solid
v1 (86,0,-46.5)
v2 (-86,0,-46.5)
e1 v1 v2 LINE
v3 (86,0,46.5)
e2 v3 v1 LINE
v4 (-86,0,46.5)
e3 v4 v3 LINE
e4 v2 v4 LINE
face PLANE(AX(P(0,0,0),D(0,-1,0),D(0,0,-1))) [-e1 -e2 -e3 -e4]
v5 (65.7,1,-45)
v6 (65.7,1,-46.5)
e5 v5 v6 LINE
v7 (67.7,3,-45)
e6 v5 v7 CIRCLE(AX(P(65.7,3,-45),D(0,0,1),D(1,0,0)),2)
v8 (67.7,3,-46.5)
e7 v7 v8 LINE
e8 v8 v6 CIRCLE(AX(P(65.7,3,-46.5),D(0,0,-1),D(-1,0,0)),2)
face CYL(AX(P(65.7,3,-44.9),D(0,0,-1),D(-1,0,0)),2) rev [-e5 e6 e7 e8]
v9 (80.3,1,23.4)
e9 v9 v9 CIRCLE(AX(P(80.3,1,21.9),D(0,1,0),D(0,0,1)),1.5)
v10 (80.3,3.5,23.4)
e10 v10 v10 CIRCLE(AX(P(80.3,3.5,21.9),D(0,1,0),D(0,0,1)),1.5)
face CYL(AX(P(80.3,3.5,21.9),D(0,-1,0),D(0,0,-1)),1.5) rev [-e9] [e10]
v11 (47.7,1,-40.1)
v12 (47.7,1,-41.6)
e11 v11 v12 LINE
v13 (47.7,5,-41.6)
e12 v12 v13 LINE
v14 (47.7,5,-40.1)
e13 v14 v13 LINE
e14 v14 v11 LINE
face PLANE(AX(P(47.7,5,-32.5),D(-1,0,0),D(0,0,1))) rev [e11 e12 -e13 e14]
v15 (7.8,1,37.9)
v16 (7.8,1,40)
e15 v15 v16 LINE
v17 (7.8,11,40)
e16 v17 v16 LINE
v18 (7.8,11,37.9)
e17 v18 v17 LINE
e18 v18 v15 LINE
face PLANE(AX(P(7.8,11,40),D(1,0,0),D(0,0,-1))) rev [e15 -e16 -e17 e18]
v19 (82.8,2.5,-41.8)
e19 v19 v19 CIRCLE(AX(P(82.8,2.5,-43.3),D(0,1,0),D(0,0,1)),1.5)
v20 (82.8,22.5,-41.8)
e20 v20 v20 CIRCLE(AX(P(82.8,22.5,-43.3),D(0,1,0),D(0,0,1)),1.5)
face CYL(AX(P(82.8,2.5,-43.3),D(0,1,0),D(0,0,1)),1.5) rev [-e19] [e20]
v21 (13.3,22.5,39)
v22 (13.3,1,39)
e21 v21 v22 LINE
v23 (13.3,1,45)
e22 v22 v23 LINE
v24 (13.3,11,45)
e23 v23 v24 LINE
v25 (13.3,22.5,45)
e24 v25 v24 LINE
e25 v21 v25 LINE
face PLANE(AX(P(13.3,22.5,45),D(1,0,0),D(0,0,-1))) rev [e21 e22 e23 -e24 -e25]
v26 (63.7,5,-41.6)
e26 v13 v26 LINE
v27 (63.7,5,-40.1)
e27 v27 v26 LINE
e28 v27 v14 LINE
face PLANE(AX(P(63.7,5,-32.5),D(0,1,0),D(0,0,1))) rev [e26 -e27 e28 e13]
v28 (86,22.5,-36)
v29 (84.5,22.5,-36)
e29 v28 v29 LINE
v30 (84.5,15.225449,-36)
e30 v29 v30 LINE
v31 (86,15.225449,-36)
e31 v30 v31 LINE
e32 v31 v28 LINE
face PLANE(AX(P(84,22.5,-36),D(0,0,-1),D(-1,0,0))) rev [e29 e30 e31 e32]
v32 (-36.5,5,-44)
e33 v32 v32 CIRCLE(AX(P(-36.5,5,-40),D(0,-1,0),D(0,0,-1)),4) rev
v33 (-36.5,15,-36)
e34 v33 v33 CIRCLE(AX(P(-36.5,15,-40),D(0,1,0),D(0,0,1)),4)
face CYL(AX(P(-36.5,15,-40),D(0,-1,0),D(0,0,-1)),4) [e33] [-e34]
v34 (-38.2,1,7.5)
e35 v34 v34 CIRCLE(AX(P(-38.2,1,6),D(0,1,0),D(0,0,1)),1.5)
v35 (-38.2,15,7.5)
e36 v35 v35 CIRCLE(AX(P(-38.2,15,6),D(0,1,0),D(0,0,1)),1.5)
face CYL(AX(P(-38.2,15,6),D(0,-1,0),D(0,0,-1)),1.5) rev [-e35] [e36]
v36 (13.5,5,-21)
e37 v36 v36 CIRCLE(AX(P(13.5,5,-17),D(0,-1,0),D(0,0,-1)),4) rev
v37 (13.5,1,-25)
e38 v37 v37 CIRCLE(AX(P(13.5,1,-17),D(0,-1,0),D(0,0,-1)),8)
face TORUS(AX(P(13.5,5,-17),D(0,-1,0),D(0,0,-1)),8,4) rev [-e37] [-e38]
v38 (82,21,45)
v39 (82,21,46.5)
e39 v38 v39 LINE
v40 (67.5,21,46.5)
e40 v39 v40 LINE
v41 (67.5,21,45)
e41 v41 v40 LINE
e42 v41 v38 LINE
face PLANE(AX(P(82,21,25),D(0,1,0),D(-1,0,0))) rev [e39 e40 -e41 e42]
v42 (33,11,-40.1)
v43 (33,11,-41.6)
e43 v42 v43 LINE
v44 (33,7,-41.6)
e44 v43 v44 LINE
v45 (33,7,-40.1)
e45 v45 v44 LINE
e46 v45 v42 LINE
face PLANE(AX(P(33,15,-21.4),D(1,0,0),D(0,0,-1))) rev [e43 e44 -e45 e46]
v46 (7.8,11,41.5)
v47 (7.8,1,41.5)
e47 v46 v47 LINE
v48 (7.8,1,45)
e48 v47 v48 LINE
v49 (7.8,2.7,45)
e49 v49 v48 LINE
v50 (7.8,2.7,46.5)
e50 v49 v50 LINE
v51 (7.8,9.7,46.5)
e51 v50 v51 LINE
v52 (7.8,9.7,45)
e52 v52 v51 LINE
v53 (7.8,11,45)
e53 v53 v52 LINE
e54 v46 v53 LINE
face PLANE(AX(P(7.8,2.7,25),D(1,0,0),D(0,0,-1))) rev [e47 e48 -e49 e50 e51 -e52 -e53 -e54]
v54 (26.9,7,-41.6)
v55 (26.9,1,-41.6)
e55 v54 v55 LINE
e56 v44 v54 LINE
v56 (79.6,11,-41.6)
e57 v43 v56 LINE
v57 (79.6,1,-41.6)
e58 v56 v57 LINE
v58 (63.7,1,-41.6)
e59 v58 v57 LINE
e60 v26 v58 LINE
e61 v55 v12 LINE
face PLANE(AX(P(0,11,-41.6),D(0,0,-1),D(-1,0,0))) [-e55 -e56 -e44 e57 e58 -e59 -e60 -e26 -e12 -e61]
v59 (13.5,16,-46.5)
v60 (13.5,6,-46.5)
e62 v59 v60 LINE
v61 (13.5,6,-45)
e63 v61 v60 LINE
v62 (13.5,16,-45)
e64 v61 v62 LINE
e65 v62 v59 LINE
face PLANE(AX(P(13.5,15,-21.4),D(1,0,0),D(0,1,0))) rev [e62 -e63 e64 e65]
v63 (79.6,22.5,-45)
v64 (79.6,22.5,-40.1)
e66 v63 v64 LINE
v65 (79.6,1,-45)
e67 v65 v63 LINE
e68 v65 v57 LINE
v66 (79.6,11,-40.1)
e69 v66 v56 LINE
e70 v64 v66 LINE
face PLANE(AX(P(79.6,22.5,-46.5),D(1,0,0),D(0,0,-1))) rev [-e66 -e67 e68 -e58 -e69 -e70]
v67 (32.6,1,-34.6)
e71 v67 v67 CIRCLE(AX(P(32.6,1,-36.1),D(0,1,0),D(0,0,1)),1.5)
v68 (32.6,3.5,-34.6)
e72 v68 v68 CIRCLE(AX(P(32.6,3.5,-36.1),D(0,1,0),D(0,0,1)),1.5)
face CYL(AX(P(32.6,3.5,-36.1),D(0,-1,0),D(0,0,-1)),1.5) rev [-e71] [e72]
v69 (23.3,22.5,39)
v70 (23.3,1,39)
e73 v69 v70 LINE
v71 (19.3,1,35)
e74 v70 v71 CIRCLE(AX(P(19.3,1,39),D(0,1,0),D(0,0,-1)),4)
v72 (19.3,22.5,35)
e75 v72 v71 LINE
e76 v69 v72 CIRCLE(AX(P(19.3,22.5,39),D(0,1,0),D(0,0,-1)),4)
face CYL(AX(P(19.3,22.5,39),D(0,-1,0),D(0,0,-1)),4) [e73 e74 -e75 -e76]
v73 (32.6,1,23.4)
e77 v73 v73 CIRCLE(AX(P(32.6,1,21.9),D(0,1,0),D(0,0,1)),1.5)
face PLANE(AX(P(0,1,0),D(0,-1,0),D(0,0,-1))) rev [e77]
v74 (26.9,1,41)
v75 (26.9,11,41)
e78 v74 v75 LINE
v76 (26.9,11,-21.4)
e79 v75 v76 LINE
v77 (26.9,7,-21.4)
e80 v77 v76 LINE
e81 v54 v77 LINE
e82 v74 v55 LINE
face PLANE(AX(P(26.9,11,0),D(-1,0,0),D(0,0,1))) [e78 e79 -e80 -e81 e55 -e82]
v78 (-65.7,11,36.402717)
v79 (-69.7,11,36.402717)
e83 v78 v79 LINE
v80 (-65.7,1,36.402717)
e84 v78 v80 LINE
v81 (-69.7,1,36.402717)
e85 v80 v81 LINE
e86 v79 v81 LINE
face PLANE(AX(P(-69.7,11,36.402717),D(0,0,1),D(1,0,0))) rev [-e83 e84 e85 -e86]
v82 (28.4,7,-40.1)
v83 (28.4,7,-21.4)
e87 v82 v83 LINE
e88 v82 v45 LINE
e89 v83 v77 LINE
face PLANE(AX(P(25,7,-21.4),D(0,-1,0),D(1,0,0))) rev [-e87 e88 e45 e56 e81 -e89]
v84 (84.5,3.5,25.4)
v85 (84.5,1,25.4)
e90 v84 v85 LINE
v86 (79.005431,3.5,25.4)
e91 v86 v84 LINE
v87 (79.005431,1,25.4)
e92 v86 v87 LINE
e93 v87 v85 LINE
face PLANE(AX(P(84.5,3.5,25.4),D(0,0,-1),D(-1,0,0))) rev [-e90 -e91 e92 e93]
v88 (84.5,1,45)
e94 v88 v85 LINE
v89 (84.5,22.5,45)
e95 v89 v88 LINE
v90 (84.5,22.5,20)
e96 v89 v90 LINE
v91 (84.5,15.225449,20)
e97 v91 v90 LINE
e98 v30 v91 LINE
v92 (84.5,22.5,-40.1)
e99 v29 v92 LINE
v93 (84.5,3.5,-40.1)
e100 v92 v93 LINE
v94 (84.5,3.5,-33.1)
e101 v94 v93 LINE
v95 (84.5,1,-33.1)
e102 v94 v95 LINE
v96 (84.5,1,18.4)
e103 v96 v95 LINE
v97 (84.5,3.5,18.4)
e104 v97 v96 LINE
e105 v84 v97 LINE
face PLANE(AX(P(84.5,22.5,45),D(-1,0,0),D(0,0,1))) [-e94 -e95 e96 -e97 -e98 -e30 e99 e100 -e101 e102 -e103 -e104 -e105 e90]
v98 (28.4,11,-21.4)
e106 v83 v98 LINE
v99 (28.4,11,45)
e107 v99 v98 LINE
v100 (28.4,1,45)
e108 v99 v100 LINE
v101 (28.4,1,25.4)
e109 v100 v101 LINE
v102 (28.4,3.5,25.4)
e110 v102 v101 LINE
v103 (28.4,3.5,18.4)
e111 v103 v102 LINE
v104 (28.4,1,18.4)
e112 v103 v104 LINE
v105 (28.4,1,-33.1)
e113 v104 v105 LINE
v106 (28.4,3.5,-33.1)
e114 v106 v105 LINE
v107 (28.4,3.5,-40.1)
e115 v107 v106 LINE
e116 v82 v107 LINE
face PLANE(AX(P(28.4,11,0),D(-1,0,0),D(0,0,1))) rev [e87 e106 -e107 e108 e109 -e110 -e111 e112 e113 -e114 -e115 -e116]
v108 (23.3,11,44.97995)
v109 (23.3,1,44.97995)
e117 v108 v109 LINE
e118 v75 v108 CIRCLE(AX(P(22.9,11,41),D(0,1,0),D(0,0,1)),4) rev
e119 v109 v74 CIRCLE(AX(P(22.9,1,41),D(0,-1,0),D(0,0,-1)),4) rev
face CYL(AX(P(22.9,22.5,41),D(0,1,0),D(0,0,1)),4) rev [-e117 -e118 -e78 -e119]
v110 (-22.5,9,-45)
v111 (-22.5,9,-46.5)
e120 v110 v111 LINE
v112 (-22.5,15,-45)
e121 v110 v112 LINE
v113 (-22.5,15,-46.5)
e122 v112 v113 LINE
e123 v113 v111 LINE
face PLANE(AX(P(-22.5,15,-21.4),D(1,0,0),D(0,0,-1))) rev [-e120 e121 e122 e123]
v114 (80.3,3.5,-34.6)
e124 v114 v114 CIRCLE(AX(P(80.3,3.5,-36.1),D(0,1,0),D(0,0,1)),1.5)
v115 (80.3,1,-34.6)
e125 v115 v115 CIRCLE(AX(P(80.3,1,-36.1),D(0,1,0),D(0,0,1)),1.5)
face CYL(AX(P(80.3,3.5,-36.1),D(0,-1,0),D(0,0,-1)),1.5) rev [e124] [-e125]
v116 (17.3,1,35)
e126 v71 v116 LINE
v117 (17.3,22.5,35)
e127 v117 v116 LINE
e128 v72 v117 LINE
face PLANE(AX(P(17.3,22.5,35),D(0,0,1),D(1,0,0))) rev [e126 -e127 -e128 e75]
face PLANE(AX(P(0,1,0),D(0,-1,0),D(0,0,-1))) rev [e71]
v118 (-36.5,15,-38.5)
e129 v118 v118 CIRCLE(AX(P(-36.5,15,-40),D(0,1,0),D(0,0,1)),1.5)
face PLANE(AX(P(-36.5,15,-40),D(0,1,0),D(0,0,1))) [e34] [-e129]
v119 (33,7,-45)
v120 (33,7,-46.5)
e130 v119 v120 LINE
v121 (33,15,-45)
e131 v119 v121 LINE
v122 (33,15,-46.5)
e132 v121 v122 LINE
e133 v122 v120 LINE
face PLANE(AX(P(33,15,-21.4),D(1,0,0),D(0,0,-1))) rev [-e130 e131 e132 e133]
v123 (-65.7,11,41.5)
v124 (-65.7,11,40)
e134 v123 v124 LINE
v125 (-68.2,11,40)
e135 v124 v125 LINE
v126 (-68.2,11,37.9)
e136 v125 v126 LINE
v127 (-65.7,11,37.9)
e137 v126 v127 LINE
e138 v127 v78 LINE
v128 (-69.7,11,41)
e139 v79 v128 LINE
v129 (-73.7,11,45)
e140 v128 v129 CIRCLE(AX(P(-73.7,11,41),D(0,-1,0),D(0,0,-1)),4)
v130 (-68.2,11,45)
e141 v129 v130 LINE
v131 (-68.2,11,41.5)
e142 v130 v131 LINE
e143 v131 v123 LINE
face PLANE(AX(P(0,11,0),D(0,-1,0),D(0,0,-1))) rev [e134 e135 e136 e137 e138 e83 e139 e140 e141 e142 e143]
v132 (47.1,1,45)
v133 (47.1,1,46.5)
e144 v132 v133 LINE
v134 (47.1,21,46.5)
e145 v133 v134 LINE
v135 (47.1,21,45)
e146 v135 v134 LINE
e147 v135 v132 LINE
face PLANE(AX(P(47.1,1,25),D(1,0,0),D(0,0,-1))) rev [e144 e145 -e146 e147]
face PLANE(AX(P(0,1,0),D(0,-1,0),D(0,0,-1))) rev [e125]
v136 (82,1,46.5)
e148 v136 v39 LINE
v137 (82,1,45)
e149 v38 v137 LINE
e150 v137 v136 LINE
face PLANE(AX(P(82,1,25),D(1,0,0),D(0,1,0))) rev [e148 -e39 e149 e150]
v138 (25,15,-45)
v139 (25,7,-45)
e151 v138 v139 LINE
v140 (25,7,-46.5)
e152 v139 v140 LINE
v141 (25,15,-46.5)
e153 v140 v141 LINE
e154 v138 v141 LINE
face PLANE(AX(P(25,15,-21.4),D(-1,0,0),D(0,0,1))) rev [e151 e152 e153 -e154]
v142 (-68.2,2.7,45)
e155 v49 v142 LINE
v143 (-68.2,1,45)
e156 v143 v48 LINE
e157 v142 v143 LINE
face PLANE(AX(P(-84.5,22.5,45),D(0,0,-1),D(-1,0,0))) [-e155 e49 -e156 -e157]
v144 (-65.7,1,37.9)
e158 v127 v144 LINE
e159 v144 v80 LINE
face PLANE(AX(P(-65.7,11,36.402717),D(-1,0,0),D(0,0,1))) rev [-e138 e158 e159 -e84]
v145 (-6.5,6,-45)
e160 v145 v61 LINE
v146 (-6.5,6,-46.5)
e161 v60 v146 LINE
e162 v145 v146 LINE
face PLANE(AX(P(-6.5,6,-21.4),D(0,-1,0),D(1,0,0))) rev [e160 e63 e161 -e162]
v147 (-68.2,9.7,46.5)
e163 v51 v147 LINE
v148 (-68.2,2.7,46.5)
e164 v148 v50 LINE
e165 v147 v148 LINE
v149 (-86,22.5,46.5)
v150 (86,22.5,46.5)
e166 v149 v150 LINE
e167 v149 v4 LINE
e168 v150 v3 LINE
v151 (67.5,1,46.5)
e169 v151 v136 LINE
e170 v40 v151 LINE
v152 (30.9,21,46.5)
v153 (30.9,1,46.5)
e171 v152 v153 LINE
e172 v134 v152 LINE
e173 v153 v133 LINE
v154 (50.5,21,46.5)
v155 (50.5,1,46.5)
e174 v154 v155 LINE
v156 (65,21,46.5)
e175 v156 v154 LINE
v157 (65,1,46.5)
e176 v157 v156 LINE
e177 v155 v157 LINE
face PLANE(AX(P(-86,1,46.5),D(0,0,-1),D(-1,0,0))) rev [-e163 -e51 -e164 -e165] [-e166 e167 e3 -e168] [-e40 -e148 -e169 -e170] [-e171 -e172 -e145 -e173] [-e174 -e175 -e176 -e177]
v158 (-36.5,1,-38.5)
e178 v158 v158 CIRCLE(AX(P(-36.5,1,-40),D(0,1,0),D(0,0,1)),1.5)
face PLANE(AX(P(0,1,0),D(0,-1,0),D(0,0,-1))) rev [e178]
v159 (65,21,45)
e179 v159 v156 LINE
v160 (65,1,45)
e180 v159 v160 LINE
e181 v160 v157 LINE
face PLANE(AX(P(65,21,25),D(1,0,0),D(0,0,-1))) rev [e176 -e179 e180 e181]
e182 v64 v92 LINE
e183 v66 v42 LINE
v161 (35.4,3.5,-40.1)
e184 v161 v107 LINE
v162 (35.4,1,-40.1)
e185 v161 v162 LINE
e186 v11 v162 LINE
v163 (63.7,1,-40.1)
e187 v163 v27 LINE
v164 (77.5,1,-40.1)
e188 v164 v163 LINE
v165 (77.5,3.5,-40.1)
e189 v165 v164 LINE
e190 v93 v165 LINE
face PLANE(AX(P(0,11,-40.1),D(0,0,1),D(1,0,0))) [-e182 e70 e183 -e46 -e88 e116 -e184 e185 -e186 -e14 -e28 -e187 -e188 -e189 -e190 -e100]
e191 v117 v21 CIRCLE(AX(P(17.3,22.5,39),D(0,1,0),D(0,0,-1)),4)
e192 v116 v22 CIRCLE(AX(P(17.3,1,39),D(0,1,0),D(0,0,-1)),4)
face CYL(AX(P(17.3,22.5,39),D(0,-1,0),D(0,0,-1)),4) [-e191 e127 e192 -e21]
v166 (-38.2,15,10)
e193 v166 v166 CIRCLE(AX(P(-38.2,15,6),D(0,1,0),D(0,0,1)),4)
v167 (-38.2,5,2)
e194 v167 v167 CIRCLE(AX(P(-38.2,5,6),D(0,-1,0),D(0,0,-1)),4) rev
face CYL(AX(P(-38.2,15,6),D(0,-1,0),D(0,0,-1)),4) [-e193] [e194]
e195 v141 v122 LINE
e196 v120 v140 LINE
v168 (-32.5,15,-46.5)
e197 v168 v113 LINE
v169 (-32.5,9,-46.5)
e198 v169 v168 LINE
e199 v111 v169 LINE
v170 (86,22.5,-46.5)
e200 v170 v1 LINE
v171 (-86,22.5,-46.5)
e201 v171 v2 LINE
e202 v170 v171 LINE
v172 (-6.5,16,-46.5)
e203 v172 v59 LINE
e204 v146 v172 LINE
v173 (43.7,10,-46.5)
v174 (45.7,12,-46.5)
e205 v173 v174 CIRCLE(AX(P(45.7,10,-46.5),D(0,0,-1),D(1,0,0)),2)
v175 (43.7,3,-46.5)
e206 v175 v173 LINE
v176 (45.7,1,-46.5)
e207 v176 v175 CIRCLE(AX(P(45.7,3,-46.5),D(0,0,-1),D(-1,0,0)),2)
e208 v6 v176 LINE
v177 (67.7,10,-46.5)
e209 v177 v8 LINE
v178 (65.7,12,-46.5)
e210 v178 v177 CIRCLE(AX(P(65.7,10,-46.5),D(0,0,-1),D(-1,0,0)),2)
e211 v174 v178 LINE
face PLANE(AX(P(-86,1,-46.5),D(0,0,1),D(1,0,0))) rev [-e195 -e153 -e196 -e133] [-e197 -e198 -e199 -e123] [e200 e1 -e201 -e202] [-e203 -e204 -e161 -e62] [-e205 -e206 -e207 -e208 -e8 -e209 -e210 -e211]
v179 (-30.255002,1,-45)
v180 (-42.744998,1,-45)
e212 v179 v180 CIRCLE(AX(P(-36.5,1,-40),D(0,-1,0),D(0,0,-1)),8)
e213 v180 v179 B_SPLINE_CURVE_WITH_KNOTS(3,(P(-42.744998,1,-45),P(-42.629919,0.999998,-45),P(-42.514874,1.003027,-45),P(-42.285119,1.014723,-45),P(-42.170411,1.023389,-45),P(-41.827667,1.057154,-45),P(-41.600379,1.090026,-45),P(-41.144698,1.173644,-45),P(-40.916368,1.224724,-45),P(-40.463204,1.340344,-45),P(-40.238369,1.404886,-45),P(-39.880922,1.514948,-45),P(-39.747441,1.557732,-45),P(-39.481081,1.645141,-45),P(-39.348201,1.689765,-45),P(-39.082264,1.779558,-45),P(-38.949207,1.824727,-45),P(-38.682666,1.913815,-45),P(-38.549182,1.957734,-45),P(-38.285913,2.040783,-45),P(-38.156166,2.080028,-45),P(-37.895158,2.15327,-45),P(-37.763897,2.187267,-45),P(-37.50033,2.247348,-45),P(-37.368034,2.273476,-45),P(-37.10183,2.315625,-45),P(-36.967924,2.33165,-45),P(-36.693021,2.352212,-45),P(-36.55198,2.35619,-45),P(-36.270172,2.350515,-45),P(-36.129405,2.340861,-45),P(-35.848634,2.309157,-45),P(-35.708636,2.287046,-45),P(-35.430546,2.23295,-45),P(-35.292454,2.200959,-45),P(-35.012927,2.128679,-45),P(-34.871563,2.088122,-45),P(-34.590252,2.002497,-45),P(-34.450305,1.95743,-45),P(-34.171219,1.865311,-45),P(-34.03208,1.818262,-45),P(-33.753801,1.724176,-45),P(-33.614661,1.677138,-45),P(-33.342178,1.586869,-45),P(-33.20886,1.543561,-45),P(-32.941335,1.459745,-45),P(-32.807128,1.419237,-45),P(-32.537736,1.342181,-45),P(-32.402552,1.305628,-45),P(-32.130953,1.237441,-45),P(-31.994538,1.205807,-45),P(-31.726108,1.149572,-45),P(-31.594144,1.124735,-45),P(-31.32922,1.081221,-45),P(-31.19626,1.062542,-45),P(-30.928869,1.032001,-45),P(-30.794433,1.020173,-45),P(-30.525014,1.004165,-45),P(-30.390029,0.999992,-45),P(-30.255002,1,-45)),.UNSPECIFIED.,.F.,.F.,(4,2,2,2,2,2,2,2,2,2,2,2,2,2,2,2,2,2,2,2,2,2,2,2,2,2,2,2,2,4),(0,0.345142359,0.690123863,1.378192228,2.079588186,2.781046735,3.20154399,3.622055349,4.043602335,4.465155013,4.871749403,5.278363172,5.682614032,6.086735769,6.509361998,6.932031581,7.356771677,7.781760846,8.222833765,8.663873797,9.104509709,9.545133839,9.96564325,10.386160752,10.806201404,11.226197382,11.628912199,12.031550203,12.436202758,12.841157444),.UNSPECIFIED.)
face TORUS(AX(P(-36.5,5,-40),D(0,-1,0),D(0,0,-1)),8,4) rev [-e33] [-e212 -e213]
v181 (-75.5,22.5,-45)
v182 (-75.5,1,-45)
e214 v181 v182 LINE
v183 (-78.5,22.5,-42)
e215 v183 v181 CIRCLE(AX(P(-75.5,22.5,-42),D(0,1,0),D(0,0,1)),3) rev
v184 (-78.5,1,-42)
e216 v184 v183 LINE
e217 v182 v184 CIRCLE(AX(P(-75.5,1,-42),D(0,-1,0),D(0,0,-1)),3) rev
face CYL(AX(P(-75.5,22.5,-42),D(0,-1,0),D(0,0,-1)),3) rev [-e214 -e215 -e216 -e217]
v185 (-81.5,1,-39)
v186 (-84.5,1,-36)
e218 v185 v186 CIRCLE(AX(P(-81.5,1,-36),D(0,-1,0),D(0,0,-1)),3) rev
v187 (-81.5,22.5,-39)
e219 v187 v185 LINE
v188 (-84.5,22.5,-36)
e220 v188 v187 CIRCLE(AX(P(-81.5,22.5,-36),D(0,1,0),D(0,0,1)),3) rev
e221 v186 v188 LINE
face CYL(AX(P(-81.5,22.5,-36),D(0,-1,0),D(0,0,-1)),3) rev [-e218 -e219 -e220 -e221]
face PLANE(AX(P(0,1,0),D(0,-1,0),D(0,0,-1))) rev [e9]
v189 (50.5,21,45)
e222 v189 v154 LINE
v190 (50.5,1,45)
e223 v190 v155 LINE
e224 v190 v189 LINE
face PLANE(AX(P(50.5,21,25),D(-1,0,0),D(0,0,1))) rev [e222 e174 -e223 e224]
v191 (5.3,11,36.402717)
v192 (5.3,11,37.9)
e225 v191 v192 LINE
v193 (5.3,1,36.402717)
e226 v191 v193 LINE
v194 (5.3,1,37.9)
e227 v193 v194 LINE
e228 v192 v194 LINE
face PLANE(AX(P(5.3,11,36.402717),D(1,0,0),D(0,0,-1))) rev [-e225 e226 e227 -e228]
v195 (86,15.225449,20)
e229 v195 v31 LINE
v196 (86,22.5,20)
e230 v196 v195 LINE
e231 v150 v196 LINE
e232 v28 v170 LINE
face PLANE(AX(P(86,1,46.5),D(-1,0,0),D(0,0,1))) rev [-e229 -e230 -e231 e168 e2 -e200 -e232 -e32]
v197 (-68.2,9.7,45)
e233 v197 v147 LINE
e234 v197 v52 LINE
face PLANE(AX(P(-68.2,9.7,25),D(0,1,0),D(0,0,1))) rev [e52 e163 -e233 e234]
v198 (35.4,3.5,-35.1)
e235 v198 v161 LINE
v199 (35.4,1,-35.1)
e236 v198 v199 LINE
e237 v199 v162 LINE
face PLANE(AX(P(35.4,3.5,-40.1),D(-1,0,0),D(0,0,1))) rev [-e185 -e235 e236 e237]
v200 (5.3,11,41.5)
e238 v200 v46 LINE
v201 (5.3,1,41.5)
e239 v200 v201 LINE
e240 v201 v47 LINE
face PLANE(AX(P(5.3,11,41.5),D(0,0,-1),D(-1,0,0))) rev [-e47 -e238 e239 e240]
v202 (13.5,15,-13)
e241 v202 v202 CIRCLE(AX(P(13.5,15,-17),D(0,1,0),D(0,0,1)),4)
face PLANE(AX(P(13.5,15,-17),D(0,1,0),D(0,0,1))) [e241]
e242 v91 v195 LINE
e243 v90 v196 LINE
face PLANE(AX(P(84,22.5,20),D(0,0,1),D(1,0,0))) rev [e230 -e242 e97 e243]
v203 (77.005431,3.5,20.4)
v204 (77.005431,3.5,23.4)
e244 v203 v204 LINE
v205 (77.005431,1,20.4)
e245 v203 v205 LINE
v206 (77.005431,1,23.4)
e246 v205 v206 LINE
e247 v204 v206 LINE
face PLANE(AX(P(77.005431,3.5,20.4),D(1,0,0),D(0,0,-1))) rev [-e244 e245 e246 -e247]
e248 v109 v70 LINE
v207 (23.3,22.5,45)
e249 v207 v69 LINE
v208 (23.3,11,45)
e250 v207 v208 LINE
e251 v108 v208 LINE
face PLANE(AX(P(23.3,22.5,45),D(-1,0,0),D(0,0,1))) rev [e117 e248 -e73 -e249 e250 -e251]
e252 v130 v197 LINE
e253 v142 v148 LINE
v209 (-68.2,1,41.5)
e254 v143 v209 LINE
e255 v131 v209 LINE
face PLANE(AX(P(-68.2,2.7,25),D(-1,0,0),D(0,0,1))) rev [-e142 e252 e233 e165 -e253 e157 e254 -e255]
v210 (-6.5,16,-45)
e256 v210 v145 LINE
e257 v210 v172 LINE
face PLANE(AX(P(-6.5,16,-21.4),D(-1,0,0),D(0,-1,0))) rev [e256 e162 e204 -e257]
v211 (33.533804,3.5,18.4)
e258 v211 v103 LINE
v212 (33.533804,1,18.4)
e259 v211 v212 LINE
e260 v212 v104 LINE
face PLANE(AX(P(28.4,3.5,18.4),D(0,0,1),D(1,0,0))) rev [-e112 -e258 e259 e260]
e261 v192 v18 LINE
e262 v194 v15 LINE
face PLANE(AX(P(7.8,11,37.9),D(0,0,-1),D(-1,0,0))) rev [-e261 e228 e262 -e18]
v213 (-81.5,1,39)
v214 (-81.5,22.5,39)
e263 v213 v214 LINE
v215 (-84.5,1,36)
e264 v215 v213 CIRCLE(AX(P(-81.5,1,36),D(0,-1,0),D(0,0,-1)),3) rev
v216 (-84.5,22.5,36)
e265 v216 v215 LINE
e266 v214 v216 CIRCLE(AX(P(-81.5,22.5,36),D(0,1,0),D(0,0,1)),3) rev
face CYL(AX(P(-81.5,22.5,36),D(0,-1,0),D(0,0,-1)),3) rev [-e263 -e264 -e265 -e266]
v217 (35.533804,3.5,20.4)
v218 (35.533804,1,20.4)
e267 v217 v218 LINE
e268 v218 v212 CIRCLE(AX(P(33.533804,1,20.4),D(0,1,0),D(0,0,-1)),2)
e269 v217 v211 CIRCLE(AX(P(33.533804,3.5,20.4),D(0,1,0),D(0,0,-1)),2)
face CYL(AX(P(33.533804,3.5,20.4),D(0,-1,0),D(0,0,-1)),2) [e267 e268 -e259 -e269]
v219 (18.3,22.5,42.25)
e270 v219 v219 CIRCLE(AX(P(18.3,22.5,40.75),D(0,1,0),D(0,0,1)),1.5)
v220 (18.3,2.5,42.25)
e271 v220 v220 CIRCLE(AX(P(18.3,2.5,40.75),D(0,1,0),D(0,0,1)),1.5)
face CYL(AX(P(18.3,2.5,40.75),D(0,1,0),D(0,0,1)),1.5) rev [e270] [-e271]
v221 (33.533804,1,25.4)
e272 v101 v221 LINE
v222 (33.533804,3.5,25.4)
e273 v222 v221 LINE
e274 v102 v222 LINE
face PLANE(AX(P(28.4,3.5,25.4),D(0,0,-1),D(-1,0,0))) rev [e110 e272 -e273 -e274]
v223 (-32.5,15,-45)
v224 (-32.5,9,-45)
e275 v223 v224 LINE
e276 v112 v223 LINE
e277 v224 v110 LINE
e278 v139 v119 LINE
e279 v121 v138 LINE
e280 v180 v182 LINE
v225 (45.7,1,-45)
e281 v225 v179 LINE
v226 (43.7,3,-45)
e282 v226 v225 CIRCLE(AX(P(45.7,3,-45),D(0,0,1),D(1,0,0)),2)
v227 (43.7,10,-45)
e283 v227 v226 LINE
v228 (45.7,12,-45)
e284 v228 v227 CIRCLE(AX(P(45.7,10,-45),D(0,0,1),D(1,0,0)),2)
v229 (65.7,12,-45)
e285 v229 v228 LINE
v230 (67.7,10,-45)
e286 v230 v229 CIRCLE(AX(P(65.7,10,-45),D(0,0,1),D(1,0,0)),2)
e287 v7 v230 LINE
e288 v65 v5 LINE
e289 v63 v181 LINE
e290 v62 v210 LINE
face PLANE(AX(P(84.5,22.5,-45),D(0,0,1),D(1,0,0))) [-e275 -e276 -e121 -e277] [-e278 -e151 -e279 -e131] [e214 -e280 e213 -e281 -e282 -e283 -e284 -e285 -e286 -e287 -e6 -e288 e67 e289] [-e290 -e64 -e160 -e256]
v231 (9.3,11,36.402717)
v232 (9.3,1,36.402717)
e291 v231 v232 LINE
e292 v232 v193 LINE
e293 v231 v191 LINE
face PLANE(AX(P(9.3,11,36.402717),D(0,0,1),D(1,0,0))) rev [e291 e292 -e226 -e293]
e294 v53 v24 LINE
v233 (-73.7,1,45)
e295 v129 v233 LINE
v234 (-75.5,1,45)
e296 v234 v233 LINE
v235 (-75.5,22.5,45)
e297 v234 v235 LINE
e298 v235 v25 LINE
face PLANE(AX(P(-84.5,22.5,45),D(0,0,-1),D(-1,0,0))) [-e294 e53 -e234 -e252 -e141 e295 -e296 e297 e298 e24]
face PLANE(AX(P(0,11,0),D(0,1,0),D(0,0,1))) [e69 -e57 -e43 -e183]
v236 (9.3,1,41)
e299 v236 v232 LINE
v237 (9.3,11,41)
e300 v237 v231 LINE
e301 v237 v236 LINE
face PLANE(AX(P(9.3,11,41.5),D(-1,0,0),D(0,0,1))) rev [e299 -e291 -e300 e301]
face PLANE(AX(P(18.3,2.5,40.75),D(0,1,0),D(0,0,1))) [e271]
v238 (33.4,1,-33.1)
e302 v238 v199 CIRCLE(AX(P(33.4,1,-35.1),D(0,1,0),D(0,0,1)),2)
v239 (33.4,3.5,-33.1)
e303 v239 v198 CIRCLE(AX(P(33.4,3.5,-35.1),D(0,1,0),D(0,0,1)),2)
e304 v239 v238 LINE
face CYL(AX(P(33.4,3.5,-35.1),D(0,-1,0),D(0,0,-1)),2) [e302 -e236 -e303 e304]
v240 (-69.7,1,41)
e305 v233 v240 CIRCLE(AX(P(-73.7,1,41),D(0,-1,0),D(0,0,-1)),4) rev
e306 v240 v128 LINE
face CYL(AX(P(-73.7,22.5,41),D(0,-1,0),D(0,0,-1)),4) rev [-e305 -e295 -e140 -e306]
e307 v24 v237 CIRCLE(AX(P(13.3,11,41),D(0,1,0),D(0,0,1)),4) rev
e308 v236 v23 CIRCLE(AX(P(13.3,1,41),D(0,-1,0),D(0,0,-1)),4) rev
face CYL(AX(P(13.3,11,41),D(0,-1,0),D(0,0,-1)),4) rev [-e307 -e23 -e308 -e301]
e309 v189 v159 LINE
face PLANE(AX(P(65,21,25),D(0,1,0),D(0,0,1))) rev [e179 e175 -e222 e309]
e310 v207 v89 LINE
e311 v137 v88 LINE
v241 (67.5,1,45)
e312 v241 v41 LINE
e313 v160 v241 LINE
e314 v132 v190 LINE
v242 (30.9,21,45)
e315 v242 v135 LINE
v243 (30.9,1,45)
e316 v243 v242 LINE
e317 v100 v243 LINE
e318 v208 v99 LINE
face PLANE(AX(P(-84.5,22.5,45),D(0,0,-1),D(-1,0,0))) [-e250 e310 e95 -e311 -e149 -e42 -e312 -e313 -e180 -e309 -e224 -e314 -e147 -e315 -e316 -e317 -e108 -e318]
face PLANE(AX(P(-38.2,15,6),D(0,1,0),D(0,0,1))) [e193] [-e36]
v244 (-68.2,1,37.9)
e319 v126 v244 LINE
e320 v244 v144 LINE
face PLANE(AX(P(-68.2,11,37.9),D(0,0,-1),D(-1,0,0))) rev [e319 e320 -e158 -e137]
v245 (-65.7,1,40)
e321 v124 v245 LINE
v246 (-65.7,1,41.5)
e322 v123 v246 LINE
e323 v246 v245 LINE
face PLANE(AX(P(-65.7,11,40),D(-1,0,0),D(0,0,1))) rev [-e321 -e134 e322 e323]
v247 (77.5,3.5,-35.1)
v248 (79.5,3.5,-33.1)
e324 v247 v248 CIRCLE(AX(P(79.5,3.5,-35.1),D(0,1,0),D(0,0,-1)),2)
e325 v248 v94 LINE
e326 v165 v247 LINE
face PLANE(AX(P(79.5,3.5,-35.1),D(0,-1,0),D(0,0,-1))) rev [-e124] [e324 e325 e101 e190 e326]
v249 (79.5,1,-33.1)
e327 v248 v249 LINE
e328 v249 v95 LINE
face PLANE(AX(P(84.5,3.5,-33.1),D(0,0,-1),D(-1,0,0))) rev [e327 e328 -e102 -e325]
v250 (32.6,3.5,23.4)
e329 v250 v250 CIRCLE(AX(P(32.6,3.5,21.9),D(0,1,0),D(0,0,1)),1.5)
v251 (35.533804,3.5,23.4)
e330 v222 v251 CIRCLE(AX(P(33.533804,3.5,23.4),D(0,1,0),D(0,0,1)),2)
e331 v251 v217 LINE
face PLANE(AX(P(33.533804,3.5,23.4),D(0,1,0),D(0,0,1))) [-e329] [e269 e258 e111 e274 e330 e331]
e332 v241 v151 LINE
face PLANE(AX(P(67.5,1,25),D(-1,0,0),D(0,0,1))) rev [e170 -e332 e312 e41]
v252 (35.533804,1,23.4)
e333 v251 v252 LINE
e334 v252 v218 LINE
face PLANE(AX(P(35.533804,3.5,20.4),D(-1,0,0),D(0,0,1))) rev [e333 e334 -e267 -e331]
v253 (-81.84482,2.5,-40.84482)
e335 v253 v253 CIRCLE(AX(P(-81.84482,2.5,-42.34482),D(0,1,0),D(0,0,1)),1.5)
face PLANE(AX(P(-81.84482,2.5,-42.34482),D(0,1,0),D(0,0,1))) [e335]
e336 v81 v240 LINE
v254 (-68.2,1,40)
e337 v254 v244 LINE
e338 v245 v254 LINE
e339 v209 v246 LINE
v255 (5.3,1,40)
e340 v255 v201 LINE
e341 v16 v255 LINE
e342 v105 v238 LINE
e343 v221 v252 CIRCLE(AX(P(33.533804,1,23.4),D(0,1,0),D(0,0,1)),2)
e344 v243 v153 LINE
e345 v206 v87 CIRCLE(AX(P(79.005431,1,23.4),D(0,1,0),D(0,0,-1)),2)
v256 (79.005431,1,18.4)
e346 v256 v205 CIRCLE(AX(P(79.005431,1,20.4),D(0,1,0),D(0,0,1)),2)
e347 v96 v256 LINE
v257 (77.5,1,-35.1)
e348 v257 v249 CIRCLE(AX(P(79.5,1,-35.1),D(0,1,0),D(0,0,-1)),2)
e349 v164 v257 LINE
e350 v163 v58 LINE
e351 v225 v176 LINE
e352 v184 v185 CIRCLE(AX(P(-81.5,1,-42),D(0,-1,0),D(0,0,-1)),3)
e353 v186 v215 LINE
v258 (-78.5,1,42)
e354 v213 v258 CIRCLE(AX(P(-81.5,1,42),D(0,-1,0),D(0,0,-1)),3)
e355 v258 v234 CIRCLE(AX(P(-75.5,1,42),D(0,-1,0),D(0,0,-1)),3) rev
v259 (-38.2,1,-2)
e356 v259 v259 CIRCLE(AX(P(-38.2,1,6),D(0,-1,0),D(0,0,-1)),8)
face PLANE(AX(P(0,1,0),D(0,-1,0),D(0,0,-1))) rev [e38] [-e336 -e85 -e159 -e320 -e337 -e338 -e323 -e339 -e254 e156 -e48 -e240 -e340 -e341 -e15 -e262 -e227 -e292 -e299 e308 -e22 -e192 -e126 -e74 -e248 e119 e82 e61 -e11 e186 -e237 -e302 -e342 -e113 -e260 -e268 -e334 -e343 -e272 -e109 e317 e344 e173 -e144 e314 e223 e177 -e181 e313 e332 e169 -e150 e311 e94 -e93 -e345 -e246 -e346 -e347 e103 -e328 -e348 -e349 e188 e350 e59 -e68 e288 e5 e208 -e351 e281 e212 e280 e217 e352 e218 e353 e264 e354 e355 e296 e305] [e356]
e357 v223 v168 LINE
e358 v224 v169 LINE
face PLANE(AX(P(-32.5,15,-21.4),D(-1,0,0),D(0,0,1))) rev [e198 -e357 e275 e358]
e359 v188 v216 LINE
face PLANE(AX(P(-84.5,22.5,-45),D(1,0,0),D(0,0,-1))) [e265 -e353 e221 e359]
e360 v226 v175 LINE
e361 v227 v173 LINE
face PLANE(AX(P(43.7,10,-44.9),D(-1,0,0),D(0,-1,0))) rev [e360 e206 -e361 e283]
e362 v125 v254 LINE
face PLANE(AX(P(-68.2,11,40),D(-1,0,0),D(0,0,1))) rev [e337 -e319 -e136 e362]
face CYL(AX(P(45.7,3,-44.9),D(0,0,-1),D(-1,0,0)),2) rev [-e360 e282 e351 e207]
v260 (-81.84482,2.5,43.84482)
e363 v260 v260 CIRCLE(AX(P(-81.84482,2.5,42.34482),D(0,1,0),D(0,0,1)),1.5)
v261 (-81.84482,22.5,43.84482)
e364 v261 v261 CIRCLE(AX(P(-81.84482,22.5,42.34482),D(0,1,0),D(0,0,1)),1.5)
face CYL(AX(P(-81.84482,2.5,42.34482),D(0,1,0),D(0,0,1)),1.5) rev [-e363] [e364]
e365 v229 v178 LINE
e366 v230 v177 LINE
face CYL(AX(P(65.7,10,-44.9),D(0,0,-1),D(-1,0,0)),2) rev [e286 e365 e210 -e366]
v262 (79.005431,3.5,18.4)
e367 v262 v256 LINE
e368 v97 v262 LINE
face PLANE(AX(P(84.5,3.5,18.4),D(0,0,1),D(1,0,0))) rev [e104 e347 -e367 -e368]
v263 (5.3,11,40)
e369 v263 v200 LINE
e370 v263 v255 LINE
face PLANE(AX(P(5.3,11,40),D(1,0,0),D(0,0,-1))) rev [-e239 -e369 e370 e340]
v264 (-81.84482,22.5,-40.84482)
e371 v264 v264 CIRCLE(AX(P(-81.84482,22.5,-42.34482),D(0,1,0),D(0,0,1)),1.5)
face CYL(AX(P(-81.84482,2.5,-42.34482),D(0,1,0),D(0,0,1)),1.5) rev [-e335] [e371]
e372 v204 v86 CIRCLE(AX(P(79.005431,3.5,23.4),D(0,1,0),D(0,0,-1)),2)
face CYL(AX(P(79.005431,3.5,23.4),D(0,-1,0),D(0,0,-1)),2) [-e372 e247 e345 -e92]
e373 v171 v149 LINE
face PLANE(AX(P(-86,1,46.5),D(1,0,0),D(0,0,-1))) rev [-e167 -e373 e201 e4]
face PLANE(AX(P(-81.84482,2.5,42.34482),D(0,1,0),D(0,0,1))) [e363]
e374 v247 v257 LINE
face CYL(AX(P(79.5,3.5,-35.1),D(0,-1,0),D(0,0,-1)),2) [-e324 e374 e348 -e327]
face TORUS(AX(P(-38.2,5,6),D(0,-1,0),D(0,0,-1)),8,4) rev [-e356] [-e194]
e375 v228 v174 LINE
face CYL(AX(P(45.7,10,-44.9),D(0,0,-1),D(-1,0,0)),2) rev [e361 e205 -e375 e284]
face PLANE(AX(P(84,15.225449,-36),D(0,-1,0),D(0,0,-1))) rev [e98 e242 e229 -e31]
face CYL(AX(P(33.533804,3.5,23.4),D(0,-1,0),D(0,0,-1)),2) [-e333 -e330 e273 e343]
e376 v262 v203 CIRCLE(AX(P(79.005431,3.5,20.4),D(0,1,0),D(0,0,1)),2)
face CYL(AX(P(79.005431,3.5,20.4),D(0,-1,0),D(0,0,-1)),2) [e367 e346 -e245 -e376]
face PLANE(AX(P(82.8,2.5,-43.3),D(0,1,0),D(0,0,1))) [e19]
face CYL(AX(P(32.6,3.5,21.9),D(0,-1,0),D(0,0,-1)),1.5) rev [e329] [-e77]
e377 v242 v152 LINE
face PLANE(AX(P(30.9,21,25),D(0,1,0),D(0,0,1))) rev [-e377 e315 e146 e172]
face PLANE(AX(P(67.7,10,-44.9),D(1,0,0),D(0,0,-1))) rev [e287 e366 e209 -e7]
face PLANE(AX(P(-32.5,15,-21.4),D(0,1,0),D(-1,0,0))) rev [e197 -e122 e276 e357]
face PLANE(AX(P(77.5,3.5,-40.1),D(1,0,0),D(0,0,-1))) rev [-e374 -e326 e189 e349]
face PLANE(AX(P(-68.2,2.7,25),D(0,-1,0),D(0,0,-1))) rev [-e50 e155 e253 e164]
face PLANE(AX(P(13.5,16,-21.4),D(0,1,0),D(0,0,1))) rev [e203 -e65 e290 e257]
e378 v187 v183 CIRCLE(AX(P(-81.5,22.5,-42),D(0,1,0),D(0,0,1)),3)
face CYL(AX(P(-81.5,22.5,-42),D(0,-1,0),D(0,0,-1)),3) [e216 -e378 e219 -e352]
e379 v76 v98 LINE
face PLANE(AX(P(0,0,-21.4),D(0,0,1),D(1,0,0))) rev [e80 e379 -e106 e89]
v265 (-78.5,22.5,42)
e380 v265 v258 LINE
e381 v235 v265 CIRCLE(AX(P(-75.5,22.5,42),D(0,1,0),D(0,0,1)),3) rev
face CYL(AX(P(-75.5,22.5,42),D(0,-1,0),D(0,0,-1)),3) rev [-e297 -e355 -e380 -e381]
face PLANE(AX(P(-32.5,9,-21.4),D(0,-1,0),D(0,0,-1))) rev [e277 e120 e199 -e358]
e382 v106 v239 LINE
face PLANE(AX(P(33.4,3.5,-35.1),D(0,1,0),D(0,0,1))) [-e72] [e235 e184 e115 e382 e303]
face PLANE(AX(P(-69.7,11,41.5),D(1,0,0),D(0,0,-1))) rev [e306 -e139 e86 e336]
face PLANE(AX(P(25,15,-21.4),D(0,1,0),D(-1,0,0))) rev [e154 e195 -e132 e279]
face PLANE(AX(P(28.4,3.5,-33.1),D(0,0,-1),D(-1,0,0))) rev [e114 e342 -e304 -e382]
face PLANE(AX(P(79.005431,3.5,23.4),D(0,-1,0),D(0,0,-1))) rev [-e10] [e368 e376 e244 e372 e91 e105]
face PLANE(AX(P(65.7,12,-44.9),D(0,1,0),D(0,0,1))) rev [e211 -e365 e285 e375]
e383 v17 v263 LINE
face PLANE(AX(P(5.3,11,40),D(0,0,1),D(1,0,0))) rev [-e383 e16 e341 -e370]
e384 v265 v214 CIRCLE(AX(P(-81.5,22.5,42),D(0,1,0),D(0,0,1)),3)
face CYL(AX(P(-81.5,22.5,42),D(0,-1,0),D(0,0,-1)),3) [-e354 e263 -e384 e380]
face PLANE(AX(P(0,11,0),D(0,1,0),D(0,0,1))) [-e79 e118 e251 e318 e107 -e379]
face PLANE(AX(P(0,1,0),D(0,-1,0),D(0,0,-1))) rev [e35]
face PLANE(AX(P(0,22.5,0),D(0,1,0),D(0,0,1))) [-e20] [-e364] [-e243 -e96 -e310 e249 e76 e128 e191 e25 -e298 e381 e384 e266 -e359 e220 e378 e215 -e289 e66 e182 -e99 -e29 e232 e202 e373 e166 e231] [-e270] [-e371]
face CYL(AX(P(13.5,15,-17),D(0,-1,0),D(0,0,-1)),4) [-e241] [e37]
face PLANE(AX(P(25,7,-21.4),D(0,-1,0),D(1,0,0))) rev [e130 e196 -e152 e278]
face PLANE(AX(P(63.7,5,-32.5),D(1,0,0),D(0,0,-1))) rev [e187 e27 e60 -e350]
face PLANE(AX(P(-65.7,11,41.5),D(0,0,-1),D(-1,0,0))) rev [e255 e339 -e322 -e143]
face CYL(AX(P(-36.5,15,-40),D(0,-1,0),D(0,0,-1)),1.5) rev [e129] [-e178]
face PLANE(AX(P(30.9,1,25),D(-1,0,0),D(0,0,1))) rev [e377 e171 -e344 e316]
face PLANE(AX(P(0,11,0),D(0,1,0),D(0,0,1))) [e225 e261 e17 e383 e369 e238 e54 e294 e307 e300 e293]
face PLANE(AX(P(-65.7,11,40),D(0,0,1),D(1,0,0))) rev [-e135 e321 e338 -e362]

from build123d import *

# Parameters (mm, degrees)
SKETCH1_W              = 172
SKETCH1_H              = 93
BOSS_EXTRUDE1_DEPTH    = 1
SKETCH2_W              = 172
SKETCH2_H              = 93
SKETCH2_W_2            = 169
SKETCH2_H_2            = 90
BOSS_EXTRUDE2_DEPTH    = 21.5
SKETCH3_W              = 14.5
SKETCH3_H              = 20
SKETCH3_W_2            = 16.2
SKETCH3_W_3            = 76
SKETCH3_H_2            = 7
CUT_EXTRUDE1_DEPTH     = 21.5
BOSS_EXTRUDE3_DEPTH    = 10
FILLET1_R              = 4
SKETCH5_R              = 1.5
BOSS_EXTRUDE4_DEPTH    = 2.5
BOSS_EXTRUDE5_DEPTH    = 10
SKETCH7_W              = 1.5
SKETCH7_H              = 3.5
BOSS_EXTRUDE6_DEPTH    = 10
FILLET2_R              = 4
SKETCH8_R              = 4
SKETCH8_R_2            = 1.5
BOSS_EXTRUDE7_DEPTH    = 14
SKETCH10_W             = 16
SKETCH10_H             = 4
CUT_EXTRUDE2_DEPTH     = 14
CUT_EXTRUDE3_DEPTH     = 1.6
FILLET3_R              = 4
SKETCH12_W             = 10
SKETCH12_H             = 6
SKETCH12_W_2           = 8
SKETCH12_H_2           = 8
CUT_EXTRUDE4_DEPTH     = 25.1
SKETCH13_W             = 6.4
SKETCH13_H             = 6.4
SKETCH13_W_2           = 6
SKETCH13_H_2           = 6
BOSS_EXTRUDE8_DEPTH    = 21.5
FILLET4_R              = 3
SKETCH14_R             = 1.5
CUT_EXTRUDE5_DEPTH     = 20
SKETCH15_W             = 172
SKETCH15_H             = 93
SKETCH15_R             = 1.5
SKETCH15_W_2           = 4
SKETCH15_H_2           = 40
SKETCH15_W_3           = 45
SKETCH15_H_3           = 6.0381788
BOSS_EXTRUDE9_DEPTH    = 2
SKETCH16_W             = 56
SKETCH16_H             = 7.274551358
CUT_EXTRUDE6_DEPTH     = 2
INTERSECT2_START       = 22.5
INTERSECT2_OUTLINE_W   = 172
INTERSECT2_OUTLINE_H   = 93
INTERSECT2_OUTLINE_R   = 1.5
INTERSECT2_OUTLINE_W_2 = 45
INTERSECT2_OUTLINE_H_2 = 6.0381788
INTERSECT2_OUTLINE_W_3 = 4
INTERSECT2_OUTLINE_H_3 = 40
INTERSECT2_DEPTH       = 2


# Read off the part's stored shape, not the designer's step: Intersect2
# Some blends are built 0.0001 mm under size
with BuildPart() as part:
    # Sketch1 → Boss-Extrude1 (new body)
    with BuildSketch(Plane(origin=(0, 0, 0), x_dir=(1, 0, 0), z_dir=(0, 1, 0))):
        Rectangle(SKETCH1_W, SKETCH1_H)
    extrude(amount=BOSS_EXTRUDE1_DEPTH)

    # Sketch2 → Boss-Extrude2 (add)
    with BuildSketch(Plane(origin=(0, 1, 0), x_dir=(1, 0, 0), z_dir=(0, 1, 0))):
        Rectangle(SKETCH2_W, SKETCH2_H)
        Rectangle(SKETCH2_W_2, SKETCH2_H_2, mode=Mode.SUBTRACT)
    extrude(amount=BOSS_EXTRUDE2_DEPTH)

    # Sketch3 → Cut-Extrude1 (cut)
    with BuildSketch(Plane.XY.offset(46.5)):
        with Locations((74.75, 11)):
            Rectangle(SKETCH3_W, SKETCH3_H)
        with Locations((57.75, 11)):
            Rectangle(SKETCH3_W, SKETCH3_H)
        with Locations((39, 11)):
            Rectangle(SKETCH3_W_2, SKETCH3_H)
        with Locations((-30.2, 6.2)):
            Rectangle(SKETCH3_W_3, SKETCH3_H_2)
    extrude(amount=-CUT_EXTRUDE1_DEPTH, mode=Mode.SUBTRACT)

    # Sketch4 → Boss-Extrude3 (add)
    with BuildSketch(Plane(origin=(0, 1, 0), x_dir=(1, 0, 0), z_dir=(0, 1, 0))):
        Polygon((26.9, -45), (28.4, -45), (28.4, 40.1), (84.5, 40.1), (84.5, 41.6), (26.9, 41.6), align=None)
    extrude(amount=BOSS_EXTRUDE3_DEPTH)

    # Fillet1
    fillet1_edges = [part.edges().sort_by_distance(p)[0] for p in [
        (26.9, 6, 45),
    ]]
    fillet(fillet1_edges, radius=FILLET1_R)

    # Sketch5 → Boss-Extrude4 (add)
    # profile 1 of 4: a face of its own
    with BuildSketch(Plane(origin=(0, 1, 0), x_dir=(1, 0, 0), z_dir=(0, 1, 0))):
        with BuildLine():
            Line((28.4, 40.1), (35.4, 40.1))
            Line((35.4, 40.1), (35.4, 35.1))
            ThreePointArc((35.4, 35.1), (34.814213562, 33.685786438), (33.4, 33.1))
            Line((33.4, 33.1), (28.4, 33.1))
            Line((28.4, 33.1), (28.4, 40.1))
        make_face()
        with Locations(Location((32.6, 36.1, 0), (0, 0, 270))):
            Circle(SKETCH5_R, mode=Mode.SUBTRACT)
    # profile 2 of 4: a face of its own
    with BuildSketch(Plane(origin=(0, 1, 0), x_dir=(1, 0, 0), z_dir=(0, 1, 0))):
        with BuildLine():
            Line((84.5, 40.1), (77.5, 40.1))
            Line((77.5, 40.1), (77.5, 35.1))
            ThreePointArc((77.5, 35.1), (78.085786438, 33.685786438), (79.5, 33.1))
            Line((79.5, 33.1), (84.5, 33.1))
            Line((84.5, 33.1), (84.5, 40.1))
        make_face()
        with Locations(Location((80.3, 36.1, 0), (0, 0, 270))):
            Circle(SKETCH5_R, mode=Mode.SUBTRACT)
    # profile 3 of 4: a face of its own
    with BuildSketch(Plane(origin=(0, 1, 0), x_dir=(1, 0, 0), z_dir=(0, 1, 0))):
        with BuildLine():
            Line((28.4, -18.4), (33.533804299, -18.4))
            ThreePointArc((33.533804299, -18.4), (34.948017861, -18.985786438), (35.533804299, -20.4))
            Line((35.533804299, -20.4), (35.533804299, -23.4))
            ThreePointArc((35.533804299, -23.4), (34.948017861, -24.814213562), (33.533804299, -25.4))
            Line((33.533804299, -25.4), (28.4, -25.4))
            Line((28.4, -25.4), (28.4, -18.4))
        make_face()
        with Locations(Location((32.6, -21.9, 0), (0, 0, 270))):
            Circle(SKETCH5_R, mode=Mode.SUBTRACT)
    # profile 4 of 4: a face of its own
    with BuildSketch(Plane(origin=(0, 1, 0), x_dir=(1, 0, 0), z_dir=(0, 1, 0))):
        with BuildLine():
            Line((84.5, -18.4), (79.00543069, -18.4))
            ThreePointArc((79.00543069, -18.4), (77.591217128, -18.985786438), (77.00543069, -20.4))
            Line((77.00543069, -20.4), (77.00543069, -23.4))
            ThreePointArc((77.00543069, -23.4), (77.591217128, -24.814213562), (79.00543069, -25.4))
            Line((79.00543069, -25.4), (84.5, -25.4))
            Line((84.5, -25.4), (84.5, -18.4))
        make_face()
        with Locations(Location((80.3, -21.9, 0), (0, 0, 270))):
            Circle(SKETCH5_R, mode=Mode.SUBTRACT)
    extrude(amount=BOSS_EXTRUDE4_DEPTH)

    # Sketch6 → Boss-Extrude5 (add)
    with BuildSketch(Plane(origin=(0, 1, 0), x_dir=(1, 0, 0), z_dir=(0, 1, 0))):
        Polygon((-65.7, -40), (-68.2, -40), (-68.2, -37.9), (-65.7, -37.9), (-65.7, -36.402716815), (-69.7, -36.402716815), (-69.7, -41.5), (-65.7, -41.5), align=None)
        Polygon((5.3, -36.402716815), (5.3, -37.9), (7.8, -37.9), (7.8, -40), (5.3, -40), (5.3, -41.5), (9.3, -41.5), (9.3, -36.402716815), align=None)
    extrude(amount=BOSS_EXTRUDE5_DEPTH)

    # Sketch7 → Boss-Extrude6 (add)
    with BuildSketch(Plane(origin=(0, 1, 0), x_dir=(1, 0, 0), z_dir=(0, 1, 0))):
        with Locations((-68.95, -43.25)):
            Rectangle(SKETCH7_W, SKETCH7_H)
        with Locations((8.55, -43.25)):
            Rectangle(SKETCH7_W, SKETCH7_H)
    extrude(amount=BOSS_EXTRUDE6_DEPTH)

    # Fillet2
    fillet2_edges = [part.edges().sort_by_distance(p)[0] for p in [
        (-69.7, 6, 45),
        (9.3, 6, 45),
    ]]
    fillet(fillet2_edges, radius=FILLET2_R)

    # Sketch8 → Boss-Extrude7 (add)
    # profile 1 of 3: a face of its own
    with BuildSketch(Plane(origin=(0, 1, 0), x_dir=(1, 0, 0), z_dir=(0, 1, 0))):
        with Locations(Location((-38.2, -6, 0), (0, 0, 90))):
            Circle(SKETCH8_R)
        with Locations(Location((-38.2, -6, 0), (0, 0, 270))):
            Circle(SKETCH8_R_2, mode=Mode.SUBTRACT)
    # profile 2 of 3: a face of its own
    with BuildSketch(Plane(origin=(0, 1, 0), x_dir=(1, 0, 0), z_dir=(0, 1, 0))):
        with Locations(Location((-36.5, 40, 0), (0, 0, 90))):
            Circle(SKETCH8_R)
        with Locations(Location((-36.5, 40, 0), (0, 0, 270))):
            Circle(SKETCH8_R_2, mode=Mode.SUBTRACT)
    # profile 3 of 3: a face of its own
    with BuildSketch(Plane(origin=(0, 1, 0), x_dir=(1, 0, 0), z_dir=(0, 1, 0))):
        with Locations(Location((13.5, 17, 0), (0, 0, 90))):
            Circle(SKETCH8_R)
    extrude(amount=BOSS_EXTRUDE7_DEPTH)

    # Sketch10 → Cut-Extrude2 (cut)
    with BuildSketch(Plane(origin=(0, 0, -46.5), x_dir=(-1, 0, 0), z_dir=(0, 0, -1))):
        with Locations((-55.7, 3)):
            Rectangle(SKETCH10_W, SKETCH10_H)
    extrude(amount=-CUT_EXTRUDE2_DEPTH, mode=Mode.SUBTRACT)

    # Sketch11 → Cut-Extrude3 (cut)
    with BuildSketch(Plane(origin=(0, 0, -46.5), x_dir=(-1, 0, 0), z_dir=(0, 0, -1))):
        with BuildLine():
            Line((-65.7, 12), (-45.7, 12))
            ThreePointArc((-45.7, 12), (-44.285786438, 11.414213562), (-43.7, 10))
            Line((-43.7, 10), (-43.7, 3))
            ThreePointArc((-43.7, 3), (-44.285786438, 1.585786438), (-45.7, 1))
            Line((-45.7, 1), (-65.7, 1))
            ThreePointArc((-65.7, 1), (-67.114213562, 1.585786438), (-67.7, 3))
            Line((-67.7, 3), (-67.7, 10))
            ThreePointArc((-67.7, 10), (-67.114213562, 11.414213562), (-65.7, 12))
        make_face()
    extrude(amount=-CUT_EXTRUDE3_DEPTH, mode=Mode.SUBTRACT)

    # Fillet3
    # the kernel refuses this fillet: 4 mm, written as the material it adds along each edge
    with BuildSketch(Plane(origin=(-36.5, 1, -40), x_dir=(0, 0, -1), z_dir=(1, 0, 0))) as fillet3_piece_1_section:
        with BuildLine():
            CenterArc((4 + FILLET3_R, FILLET3_R), FILLET3_R, 180, 90)
            Line((4, FILLET3_R), (4, 0))
            Line((4, 0), (4 + FILLET3_R, 0))
        make_face()
    fillet3_piece_1 = revolve(axis=Axis((-36.5, 1, -40), (0, 1, 0)), mode=Mode.PRIVATE)
    fillet3_piece_1 = split(fillet3_piece_1, bisect_by=Plane(origin=(-36.5, 2.138882343, -45), z_dir=(0, 0, 1)), keep=Keep.TOP, mode=Mode.PRIVATE)
    add(fillet3_piece_1)
    with BuildSketch(Plane(origin=(-38.2, 1, 6), x_dir=(0, 0, -1), z_dir=(1, 0, 0))) as fillet3_piece_2:
        with BuildLine():
            CenterArc((4 + FILLET3_R, FILLET3_R), FILLET3_R, 180, 90)
            Line((4, FILLET3_R), (4, 0))
            Line((4, 0), (4 + FILLET3_R, 0))
        make_face()
    revolve(axis=Axis((-38.2, 1, 6), (0, 1, 0)))
    with BuildSketch(Plane(origin=(13.5, 1, -17), x_dir=(0, 0, -1), z_dir=(1, 0, 0))) as fillet3_piece_3:
        with BuildLine():
            CenterArc((4 + FILLET3_R, FILLET3_R), FILLET3_R, 180, 90)
            Line((4, FILLET3_R), (4, 0))
            Line((4, 0), (4 + FILLET3_R, 0))
        make_face()
    revolve(axis=Axis((13.5, 1, -17), (0, 1, 0)))

    # Sketch12 → Cut-Extrude4 (cut)
    with BuildSketch(Plane(origin=(0, 0, -46.5), x_dir=(-1, 0, 0), z_dir=(0, 0, -1))):
        with Locations((27.5, 12)):
            Rectangle(SKETCH12_W, SKETCH12_H)
        Polygon((-13.5, 15), (-13.5, 16), (6.5, 16), (6.5, 15), (6.5, 6), (-13.5, 6), align=None)
        with Locations((-29, 11)):
            Rectangle(SKETCH12_W_2, SKETCH12_H_2)
    extrude(amount=-CUT_EXTRUDE4_DEPTH, mode=Mode.SUBTRACT)

    # Sketch13 → Boss-Extrude8 (add)
    with BuildSketch(Plane(origin=(0, 1, 0), x_dir=(1, 0, 0), z_dir=(0, 1, 0))):
        with Locations((82.8, 43.3)):
            Rectangle(SKETCH13_W, SKETCH13_H)
        with Locations((-81.5, 42)):
            Rectangle(SKETCH13_W_2, SKETCH13_H_2)
        with Locations((-81.5, -42)):
            Rectangle(SKETCH13_W_2, SKETCH13_H_2)
        with BuildLine():
            Line((13.3, -45), (23.3, -45))
            Line((23.3, -45), (23.3, -39))
            ThreePointArc((23.3, -39), (22.128427125, -36.171572875), (19.3, -35))
            Line((19.3, -35), (17.3, -35))
            ThreePointArc((17.3, -35), (14.471572875, -36.171572875), (13.3, -39))
            Line((13.3, -39), (13.3, -45))
        make_face()
    extrude(amount=BOSS_EXTRUDE8_DEPTH)

    # Fillet4
    fillet4_edges = [part.edges().sort_by_distance(p)[0] for p in [
        (-78.5, 11.75, 39),
        (-78.5, 11.75, 45),
        (-84.5, 11.75, 39),
        (-78.5, 11.75, -39),
        (-78.5, 11.75, -45),
        (-84.5, 11.75, -39),
    ]]
    fillet(fillet4_edges, radius=FILLET4_R - 0.0001)  # a hair under: the kernel refuses the full size

    # Sketch14 → Cut-Extrude5 (cut)
    with BuildSketch(Plane(origin=(0, 22.5, 0), x_dir=(1, 0, 0), z_dir=(0, 1, 0))):
        with Locations(Location((-81.844819979, 42.344819979, 0), (0, 0, 270))):
            Circle(SKETCH14_R)
        with Locations(Location((-81.844819979, -42.344819979, 0), (0, 0, 270))):
            Circle(SKETCH14_R)
        with Locations(Location((18.3, -40.75, 0), (0, 0, 270))):
            Circle(SKETCH14_R)
        with Locations(Location((82.8, 43.3, 0), (0, 0, 270))):
            Circle(SKETCH14_R)
    extrude(amount=-CUT_EXTRUDE5_DEPTH, mode=Mode.SUBTRACT)

    # Sketch16 → Cut-Extrude6 (cut)
    with BuildSketch(Plane(origin=(86, 0, 0), x_dir=(0, 0, -1), z_dir=(1, 0, 0))):
        with Locations((8, 18.862724321)):
            Rectangle(SKETCH16_W, SKETCH16_H)
    extrude(amount=-CUT_EXTRUDE6_DEPTH, mode=Mode.SUBTRACT)


with BuildPart() as body_2:
    # Sketch15 → Boss-Extrude9 (new body)
    with BuildSketch(Plane(origin=(0, 22.5, 0), x_dir=(1, 0, 0), z_dir=(0, 1, 0))):
        Rectangle(SKETCH15_W, SKETCH15_H)
        with Locations(Location((82.8, 43.3, 0), (0, 0, 270))):
            Circle(SKETCH15_R, mode=Mode.SUBTRACT)
        with Locations(Location((18.3, -40.75, 0), (0, 0, 270))):
            Circle(SKETCH15_R, mode=Mode.SUBTRACT)
        with Locations(Location((-81.844819979, -42.344819979, 0), (0, 0, 270))):
            Circle(SKETCH15_R, mode=Mode.SUBTRACT)
        with Locations(Location((-81.844819979, 42.344819979, 0), (0, 0, 270))):
            Circle(SKETCH15_R, mode=Mode.SUBTRACT)
        with Locations((-54.124331846, 14.769848195)):
            Rectangle(SKETCH15_W_2, SKETCH15_H_2, mode=Mode.SUBTRACT)
        with Locations((-64.124331846, 14.769848195)):
            Rectangle(SKETCH15_W_2, SKETCH15_H_2, mode=Mode.SUBTRACT)
        with Locations((-44.124331846, 14.769848195)):
            Rectangle(SKETCH15_W_2, SKETCH15_H_2, mode=Mode.SUBTRACT)
        with Locations((-34.124331846, 14.769848195)):
            Rectangle(SKETCH15_W_2, SKETCH15_H_2, mode=Mode.SUBTRACT)
        with Locations((-24.124331846, 14.769848195)):
            Rectangle(SKETCH15_W_2, SKETCH15_H_2, mode=Mode.SUBTRACT)
        with Locations((-14.124331846, 14.769848195)):
            Rectangle(SKETCH15_W_2, SKETCH15_H_2, mode=Mode.SUBTRACT)
        with Locations((-4.124331846, 14.769848195)):
            Rectangle(SKETCH15_W_2, SKETCH15_H_2, mode=Mode.SUBTRACT)
        with Locations((5.875668154, 14.769848195)):
            Rectangle(SKETCH15_W_2, SKETCH15_H_2, mode=Mode.SUBTRACT)
        with Locations((15.875668154, 14.769848195)):
            Rectangle(SKETCH15_W_2, SKETCH15_H_2, mode=Mode.SUBTRACT)
        with Locations((0, -31.942161626)):
            Rectangle(SKETCH15_W_3, SKETCH15_H_3, mode=Mode.SUBTRACT)
    extrude(amount=BOSS_EXTRUDE9_DEPTH)

    # Intersect2 outline → Intersect2 (cut)
    with BuildSketch(Plane(origin=(0, 0, 0), x_dir=(1, 0, 0), z_dir=(0, 1, 0)).offset(INTERSECT2_START)):
        Rectangle(INTERSECT2_OUTLINE_W, INTERSECT2_OUTLINE_H)
        with Locations((-81.844819979, -42.344819979)):
            Circle(INTERSECT2_OUTLINE_R, mode=Mode.SUBTRACT)
        with Locations((18.3, -40.75)):
            Circle(INTERSECT2_OUTLINE_R, mode=Mode.SUBTRACT)
        with Locations((0, -31.942161626)):
            Rectangle(INTERSECT2_OUTLINE_W_2, INTERSECT2_OUTLINE_H_2, mode=Mode.SUBTRACT)
        with Locations((-64.124331846, 14.769848195)):
            Rectangle(INTERSECT2_OUTLINE_W_3, INTERSECT2_OUTLINE_H_3, mode=Mode.SUBTRACT)
        with Locations((-54.124331846, 14.769848195)):
            Rectangle(INTERSECT2_OUTLINE_W_3, INTERSECT2_OUTLINE_H_3, mode=Mode.SUBTRACT)
        with Locations((-44.124331846, 14.769848195)):
            Rectangle(INTERSECT2_OUTLINE_W_3, INTERSECT2_OUTLINE_H_3, mode=Mode.SUBTRACT)
        with Locations((-34.124331846, 14.769848195)):
            Rectangle(INTERSECT2_OUTLINE_W_3, INTERSECT2_OUTLINE_H_3, mode=Mode.SUBTRACT)
        with Locations((-24.124331846, 14.769848195)):
            Rectangle(INTERSECT2_OUTLINE_W_3, INTERSECT2_OUTLINE_H_3, mode=Mode.SUBTRACT)
        with Locations((-14.124331846, 14.769848195)):
            Rectangle(INTERSECT2_OUTLINE_W_3, INTERSECT2_OUTLINE_H_3, mode=Mode.SUBTRACT)
        with Locations((-4.124331846, 14.769848195)):
            Rectangle(INTERSECT2_OUTLINE_W_3, INTERSECT2_OUTLINE_H_3, mode=Mode.SUBTRACT)
        with Locations((-81.844819979, 42.344819979)):
            Circle(INTERSECT2_OUTLINE_R, mode=Mode.SUBTRACT)
        with Locations((5.875668154, 14.769848195)):
            Rectangle(INTERSECT2_OUTLINE_W_3, INTERSECT2_OUTLINE_H_3, mode=Mode.SUBTRACT)
        with Locations((15.875668154, 14.769848195)):
            Rectangle(INTERSECT2_OUTLINE_W_3, INTERSECT2_OUTLINE_H_3, mode=Mode.SUBTRACT)
        with Locations((82.8, 43.3)):
            Circle(INTERSECT2_OUTLINE_R, mode=Mode.SUBTRACT)
    extrude(amount=INTERSECT2_DEPTH, mode=Mode.SUBTRACT)


solid = part.part
